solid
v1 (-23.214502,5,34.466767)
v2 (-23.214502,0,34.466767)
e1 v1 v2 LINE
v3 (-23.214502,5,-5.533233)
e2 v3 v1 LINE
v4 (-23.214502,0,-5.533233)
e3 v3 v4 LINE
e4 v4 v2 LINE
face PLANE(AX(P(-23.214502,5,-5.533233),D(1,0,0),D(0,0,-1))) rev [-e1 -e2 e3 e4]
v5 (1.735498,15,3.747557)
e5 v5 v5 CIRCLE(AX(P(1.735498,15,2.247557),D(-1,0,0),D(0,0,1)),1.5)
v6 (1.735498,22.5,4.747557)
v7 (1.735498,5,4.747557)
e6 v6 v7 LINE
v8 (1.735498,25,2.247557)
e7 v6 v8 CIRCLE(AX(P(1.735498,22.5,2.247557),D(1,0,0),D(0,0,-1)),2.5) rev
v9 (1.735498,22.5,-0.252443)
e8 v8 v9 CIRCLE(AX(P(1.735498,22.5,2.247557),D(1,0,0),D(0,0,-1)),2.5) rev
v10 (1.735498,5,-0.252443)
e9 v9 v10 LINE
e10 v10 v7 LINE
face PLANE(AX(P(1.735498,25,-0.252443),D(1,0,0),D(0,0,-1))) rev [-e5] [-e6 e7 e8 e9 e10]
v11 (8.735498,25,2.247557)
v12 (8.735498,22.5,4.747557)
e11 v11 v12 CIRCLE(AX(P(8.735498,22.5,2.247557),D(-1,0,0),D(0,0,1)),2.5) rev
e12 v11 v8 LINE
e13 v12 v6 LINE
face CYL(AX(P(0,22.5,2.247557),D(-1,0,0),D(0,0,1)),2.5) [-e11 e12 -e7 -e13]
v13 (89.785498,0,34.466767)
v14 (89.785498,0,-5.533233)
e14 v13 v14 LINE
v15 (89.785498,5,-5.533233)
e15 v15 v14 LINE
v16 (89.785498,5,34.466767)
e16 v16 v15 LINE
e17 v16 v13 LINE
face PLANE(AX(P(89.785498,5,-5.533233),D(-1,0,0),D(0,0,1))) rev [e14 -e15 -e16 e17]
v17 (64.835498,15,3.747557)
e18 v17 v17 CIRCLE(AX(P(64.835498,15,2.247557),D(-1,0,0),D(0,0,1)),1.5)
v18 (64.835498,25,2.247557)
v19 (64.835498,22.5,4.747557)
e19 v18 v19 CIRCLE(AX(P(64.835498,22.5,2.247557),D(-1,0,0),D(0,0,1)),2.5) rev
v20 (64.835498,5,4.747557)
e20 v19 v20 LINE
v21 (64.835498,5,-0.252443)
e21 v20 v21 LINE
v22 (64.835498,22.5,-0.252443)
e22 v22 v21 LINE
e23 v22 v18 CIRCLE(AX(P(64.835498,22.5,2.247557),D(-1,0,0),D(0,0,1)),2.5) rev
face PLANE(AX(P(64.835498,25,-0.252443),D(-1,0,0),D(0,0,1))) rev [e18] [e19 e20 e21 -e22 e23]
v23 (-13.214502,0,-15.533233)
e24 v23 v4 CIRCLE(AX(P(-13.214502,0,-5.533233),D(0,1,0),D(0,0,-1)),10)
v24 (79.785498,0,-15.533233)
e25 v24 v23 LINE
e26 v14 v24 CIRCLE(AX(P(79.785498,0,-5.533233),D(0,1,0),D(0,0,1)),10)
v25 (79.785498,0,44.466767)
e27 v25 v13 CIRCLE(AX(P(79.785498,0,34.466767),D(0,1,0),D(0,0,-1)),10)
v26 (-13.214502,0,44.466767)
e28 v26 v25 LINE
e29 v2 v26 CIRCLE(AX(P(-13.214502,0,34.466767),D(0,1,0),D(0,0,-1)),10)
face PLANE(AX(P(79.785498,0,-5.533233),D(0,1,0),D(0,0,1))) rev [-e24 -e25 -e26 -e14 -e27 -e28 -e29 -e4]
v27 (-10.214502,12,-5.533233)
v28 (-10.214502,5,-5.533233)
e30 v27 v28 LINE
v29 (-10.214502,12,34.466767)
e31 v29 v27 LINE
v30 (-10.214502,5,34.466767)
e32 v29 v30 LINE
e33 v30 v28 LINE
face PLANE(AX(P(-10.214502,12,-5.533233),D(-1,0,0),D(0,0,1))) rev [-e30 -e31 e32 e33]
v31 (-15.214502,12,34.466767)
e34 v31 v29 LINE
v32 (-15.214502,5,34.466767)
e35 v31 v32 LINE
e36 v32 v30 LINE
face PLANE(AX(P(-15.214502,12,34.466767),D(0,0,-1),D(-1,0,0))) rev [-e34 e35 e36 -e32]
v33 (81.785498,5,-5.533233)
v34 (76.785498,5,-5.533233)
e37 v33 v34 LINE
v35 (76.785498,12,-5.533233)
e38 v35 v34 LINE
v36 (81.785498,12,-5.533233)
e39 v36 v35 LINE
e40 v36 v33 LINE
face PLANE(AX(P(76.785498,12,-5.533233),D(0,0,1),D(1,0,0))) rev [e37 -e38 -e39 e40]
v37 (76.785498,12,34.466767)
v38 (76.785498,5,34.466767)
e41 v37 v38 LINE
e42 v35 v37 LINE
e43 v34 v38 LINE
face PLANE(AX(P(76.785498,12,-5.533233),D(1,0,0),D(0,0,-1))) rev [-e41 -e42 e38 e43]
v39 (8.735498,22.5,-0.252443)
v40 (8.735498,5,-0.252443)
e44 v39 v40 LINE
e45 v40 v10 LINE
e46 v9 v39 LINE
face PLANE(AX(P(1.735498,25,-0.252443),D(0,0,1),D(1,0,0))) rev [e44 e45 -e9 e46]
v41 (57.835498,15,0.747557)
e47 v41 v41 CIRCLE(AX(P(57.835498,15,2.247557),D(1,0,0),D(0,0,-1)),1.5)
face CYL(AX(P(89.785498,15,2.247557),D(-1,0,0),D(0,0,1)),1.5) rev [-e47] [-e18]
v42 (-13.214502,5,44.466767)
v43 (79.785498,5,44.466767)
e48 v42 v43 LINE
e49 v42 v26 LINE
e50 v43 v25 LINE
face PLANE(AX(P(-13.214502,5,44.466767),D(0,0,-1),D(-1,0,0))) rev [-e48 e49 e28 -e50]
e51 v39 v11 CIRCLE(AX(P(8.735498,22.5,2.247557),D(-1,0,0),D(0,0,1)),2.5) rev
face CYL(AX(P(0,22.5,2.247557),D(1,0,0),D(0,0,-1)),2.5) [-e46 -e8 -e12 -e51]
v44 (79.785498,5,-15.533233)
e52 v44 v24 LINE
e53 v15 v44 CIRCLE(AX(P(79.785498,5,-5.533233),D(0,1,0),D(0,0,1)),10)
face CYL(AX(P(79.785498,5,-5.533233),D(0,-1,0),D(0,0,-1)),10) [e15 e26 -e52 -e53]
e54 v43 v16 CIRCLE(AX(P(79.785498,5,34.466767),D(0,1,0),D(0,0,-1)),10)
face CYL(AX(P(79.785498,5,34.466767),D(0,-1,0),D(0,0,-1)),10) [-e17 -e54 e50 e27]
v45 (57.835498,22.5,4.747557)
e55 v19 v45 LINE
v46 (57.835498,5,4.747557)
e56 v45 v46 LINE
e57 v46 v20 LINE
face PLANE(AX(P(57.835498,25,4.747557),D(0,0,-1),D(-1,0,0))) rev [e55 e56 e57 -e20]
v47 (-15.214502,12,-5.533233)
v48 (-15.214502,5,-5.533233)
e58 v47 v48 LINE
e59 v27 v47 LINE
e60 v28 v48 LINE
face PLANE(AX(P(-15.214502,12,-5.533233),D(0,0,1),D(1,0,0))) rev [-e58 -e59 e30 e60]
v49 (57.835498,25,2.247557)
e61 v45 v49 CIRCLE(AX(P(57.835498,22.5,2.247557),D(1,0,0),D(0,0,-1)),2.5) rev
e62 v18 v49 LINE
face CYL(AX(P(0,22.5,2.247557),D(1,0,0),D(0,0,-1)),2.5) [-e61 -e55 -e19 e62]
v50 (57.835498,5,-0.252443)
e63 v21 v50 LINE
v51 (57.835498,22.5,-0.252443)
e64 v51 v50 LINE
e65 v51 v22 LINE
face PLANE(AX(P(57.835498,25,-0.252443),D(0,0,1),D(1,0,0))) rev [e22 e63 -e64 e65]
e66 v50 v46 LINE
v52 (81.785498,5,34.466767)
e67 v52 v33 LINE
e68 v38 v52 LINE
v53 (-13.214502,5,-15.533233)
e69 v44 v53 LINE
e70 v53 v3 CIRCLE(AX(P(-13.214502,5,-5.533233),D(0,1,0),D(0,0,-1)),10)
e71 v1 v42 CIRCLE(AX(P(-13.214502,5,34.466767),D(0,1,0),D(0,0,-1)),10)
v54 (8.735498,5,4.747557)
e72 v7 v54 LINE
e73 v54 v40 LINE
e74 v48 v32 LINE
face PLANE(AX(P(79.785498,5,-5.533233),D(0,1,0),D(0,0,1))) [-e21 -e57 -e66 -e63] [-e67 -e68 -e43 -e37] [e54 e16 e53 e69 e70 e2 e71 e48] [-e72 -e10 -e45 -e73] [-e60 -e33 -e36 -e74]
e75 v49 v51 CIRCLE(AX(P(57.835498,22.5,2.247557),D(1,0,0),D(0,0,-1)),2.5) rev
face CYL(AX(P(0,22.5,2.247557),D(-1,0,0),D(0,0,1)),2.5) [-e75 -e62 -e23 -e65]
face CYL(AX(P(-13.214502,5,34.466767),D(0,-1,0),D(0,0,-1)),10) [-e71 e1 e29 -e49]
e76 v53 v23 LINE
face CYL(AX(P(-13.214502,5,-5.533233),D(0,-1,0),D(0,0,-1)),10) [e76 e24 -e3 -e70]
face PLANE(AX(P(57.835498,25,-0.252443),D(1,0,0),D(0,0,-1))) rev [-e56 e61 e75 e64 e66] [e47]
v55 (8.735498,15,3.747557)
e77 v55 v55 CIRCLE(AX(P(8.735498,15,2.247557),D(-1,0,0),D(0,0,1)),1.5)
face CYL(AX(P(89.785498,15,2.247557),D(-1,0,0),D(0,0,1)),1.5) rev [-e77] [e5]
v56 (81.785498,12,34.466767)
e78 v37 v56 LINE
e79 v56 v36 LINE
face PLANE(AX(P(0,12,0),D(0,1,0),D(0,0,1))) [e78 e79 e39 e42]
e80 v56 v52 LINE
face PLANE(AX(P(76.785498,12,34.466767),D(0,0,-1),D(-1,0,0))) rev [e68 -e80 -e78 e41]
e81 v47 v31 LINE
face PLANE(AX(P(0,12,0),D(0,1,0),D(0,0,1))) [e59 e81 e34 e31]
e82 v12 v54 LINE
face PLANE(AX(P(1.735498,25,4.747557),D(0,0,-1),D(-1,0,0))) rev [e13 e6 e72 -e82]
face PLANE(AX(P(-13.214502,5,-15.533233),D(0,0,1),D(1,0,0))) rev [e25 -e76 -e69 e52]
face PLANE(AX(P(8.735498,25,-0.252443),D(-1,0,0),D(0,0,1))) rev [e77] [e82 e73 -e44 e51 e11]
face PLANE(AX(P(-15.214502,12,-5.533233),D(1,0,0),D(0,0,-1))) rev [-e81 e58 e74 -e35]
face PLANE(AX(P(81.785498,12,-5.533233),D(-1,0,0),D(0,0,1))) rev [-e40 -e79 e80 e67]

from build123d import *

# Parameters (mm, degrees)
RESSALTO_EXTRUS_O1_DEPTH = 5
ESBO_O2_W                = 7
ESBO_O2_H                = 5
RESSALTO_EXTRUS_O2_DEPTH = 20
ESBO_O4_R                = 1.5
CORTE_EXTRUS_O1_DEPTH    = 102.759991649
ESBO_O5_W                = 5
ESBO_O5_H                = 40
RESSALTO_EXTRUS_O3_DEPTH = 7
FILETE1_R                = 2.5
FILETE2_R                = 2.5
FILETE3_R                = 2.5


with BuildPart() as part:
    # Esboço1 → Ressalto-extrusão1 (new body)
    with BuildSketch(Plane(origin=(0, 0, 0), x_dir=(1, 0, 0), z_dir=(0, 1, 0))):
        with BuildLine():
            Line((-13.214501511, 15.533232628), (79.785498489, 15.533232628))
            ThreePointArc((79.785498489, 15.533232628), (86.856566301, 12.60430044), (89.785498489, 5.533232628))
            Line((89.785498489, 5.533232628), (89.785498489, -34.466767372))
            ThreePointArc((89.785498489, -34.466767372), (86.856566301, -41.537835183), (79.785498489, -44.466767372))
            Line((79.785498489, -44.466767372), (-13.214501511, -44.466767372))
            ThreePointArc((-13.214501511, -44.466767372), (-20.285569322, -41.537835183), (-23.214501511, -34.466767372))
            Line((-23.214501511, -34.466767372), (-23.214501511, 5.533232628))
            ThreePointArc((-23.214501511, 5.533232628), (-20.285569322, 12.60430044), (-13.214501511, 15.533232628))
        make_face()
    extrude(amount=RESSALTO_EXTRUS_O1_DEPTH)

    # Esboço2 → Ressalto-extrusão2 (add)
    with BuildSketch(Plane(origin=(0, 5, 0), x_dir=(1, 0, 0), z_dir=(0, 1, 0))):
        with Locations((61.335498489, -2.247557162)):
            Rectangle(ESBO_O2_W, ESBO_O2_H)
        with Locations((5.235498489, -2.247557162)):
            Rectangle(ESBO_O2_W, ESBO_O2_H)
    extrude(amount=RESSALTO_EXTRUS_O2_DEPTH)

    # Esboço4 → Corte-extrusão1 (cut, through all)
    with BuildSketch(Plane.ZY.offset(-1.735498489)):
        with Locations((2.247557162, 15)):
            Circle(ESBO_O4_R)
    extrude(amount=-CORTE_EXTRUS_O1_DEPTH, mode=Mode.SUBTRACT)

    # Esboço5 → Ressalto-extrusão3 (add)
    with BuildSketch(Plane(origin=(0, 5, 0), x_dir=(1, 0, 0), z_dir=(0, 1, 0))):
        with Locations((-12.714501511, -14.466767372)):
            Rectangle(ESBO_O5_W, ESBO_O5_H)
        with Locations((79.285498489, -14.466767372)):
            Rectangle(ESBO_O5_W, ESBO_O5_H)
    extrude(amount=RESSALTO_EXTRUS_O3_DEPTH)

    # Filete1
    filete1_edges = [part.edges().sort_by_distance(p)[0] for p in [
        (5.235498489, 25, -0.252442838),
    ]]
    fillet(filete1_edges, radius=FILETE1_R)

    # Filete2
    filete2_edges = [part.edges().sort_by_distance(p)[0] for p in [
        (5.235498489, 25, 4.747557162),
    ]]
    fillet(filete2_edges, radius=FILETE2_R - 0.0001)  # a hair under: the kernel refuses the full size

    # Filete3
    filete3_edges = [part.edges().sort_by_distance(p)[0] for p in [
        (61.335498489, 25, 4.747557162),
        (61.335498489, 25, -0.252442838),
    ]]
    fillet(filete3_edges, radius=FILETE3_R - 0.0001)  # a hair under: the kernel refuses the full size


solid = part.part
